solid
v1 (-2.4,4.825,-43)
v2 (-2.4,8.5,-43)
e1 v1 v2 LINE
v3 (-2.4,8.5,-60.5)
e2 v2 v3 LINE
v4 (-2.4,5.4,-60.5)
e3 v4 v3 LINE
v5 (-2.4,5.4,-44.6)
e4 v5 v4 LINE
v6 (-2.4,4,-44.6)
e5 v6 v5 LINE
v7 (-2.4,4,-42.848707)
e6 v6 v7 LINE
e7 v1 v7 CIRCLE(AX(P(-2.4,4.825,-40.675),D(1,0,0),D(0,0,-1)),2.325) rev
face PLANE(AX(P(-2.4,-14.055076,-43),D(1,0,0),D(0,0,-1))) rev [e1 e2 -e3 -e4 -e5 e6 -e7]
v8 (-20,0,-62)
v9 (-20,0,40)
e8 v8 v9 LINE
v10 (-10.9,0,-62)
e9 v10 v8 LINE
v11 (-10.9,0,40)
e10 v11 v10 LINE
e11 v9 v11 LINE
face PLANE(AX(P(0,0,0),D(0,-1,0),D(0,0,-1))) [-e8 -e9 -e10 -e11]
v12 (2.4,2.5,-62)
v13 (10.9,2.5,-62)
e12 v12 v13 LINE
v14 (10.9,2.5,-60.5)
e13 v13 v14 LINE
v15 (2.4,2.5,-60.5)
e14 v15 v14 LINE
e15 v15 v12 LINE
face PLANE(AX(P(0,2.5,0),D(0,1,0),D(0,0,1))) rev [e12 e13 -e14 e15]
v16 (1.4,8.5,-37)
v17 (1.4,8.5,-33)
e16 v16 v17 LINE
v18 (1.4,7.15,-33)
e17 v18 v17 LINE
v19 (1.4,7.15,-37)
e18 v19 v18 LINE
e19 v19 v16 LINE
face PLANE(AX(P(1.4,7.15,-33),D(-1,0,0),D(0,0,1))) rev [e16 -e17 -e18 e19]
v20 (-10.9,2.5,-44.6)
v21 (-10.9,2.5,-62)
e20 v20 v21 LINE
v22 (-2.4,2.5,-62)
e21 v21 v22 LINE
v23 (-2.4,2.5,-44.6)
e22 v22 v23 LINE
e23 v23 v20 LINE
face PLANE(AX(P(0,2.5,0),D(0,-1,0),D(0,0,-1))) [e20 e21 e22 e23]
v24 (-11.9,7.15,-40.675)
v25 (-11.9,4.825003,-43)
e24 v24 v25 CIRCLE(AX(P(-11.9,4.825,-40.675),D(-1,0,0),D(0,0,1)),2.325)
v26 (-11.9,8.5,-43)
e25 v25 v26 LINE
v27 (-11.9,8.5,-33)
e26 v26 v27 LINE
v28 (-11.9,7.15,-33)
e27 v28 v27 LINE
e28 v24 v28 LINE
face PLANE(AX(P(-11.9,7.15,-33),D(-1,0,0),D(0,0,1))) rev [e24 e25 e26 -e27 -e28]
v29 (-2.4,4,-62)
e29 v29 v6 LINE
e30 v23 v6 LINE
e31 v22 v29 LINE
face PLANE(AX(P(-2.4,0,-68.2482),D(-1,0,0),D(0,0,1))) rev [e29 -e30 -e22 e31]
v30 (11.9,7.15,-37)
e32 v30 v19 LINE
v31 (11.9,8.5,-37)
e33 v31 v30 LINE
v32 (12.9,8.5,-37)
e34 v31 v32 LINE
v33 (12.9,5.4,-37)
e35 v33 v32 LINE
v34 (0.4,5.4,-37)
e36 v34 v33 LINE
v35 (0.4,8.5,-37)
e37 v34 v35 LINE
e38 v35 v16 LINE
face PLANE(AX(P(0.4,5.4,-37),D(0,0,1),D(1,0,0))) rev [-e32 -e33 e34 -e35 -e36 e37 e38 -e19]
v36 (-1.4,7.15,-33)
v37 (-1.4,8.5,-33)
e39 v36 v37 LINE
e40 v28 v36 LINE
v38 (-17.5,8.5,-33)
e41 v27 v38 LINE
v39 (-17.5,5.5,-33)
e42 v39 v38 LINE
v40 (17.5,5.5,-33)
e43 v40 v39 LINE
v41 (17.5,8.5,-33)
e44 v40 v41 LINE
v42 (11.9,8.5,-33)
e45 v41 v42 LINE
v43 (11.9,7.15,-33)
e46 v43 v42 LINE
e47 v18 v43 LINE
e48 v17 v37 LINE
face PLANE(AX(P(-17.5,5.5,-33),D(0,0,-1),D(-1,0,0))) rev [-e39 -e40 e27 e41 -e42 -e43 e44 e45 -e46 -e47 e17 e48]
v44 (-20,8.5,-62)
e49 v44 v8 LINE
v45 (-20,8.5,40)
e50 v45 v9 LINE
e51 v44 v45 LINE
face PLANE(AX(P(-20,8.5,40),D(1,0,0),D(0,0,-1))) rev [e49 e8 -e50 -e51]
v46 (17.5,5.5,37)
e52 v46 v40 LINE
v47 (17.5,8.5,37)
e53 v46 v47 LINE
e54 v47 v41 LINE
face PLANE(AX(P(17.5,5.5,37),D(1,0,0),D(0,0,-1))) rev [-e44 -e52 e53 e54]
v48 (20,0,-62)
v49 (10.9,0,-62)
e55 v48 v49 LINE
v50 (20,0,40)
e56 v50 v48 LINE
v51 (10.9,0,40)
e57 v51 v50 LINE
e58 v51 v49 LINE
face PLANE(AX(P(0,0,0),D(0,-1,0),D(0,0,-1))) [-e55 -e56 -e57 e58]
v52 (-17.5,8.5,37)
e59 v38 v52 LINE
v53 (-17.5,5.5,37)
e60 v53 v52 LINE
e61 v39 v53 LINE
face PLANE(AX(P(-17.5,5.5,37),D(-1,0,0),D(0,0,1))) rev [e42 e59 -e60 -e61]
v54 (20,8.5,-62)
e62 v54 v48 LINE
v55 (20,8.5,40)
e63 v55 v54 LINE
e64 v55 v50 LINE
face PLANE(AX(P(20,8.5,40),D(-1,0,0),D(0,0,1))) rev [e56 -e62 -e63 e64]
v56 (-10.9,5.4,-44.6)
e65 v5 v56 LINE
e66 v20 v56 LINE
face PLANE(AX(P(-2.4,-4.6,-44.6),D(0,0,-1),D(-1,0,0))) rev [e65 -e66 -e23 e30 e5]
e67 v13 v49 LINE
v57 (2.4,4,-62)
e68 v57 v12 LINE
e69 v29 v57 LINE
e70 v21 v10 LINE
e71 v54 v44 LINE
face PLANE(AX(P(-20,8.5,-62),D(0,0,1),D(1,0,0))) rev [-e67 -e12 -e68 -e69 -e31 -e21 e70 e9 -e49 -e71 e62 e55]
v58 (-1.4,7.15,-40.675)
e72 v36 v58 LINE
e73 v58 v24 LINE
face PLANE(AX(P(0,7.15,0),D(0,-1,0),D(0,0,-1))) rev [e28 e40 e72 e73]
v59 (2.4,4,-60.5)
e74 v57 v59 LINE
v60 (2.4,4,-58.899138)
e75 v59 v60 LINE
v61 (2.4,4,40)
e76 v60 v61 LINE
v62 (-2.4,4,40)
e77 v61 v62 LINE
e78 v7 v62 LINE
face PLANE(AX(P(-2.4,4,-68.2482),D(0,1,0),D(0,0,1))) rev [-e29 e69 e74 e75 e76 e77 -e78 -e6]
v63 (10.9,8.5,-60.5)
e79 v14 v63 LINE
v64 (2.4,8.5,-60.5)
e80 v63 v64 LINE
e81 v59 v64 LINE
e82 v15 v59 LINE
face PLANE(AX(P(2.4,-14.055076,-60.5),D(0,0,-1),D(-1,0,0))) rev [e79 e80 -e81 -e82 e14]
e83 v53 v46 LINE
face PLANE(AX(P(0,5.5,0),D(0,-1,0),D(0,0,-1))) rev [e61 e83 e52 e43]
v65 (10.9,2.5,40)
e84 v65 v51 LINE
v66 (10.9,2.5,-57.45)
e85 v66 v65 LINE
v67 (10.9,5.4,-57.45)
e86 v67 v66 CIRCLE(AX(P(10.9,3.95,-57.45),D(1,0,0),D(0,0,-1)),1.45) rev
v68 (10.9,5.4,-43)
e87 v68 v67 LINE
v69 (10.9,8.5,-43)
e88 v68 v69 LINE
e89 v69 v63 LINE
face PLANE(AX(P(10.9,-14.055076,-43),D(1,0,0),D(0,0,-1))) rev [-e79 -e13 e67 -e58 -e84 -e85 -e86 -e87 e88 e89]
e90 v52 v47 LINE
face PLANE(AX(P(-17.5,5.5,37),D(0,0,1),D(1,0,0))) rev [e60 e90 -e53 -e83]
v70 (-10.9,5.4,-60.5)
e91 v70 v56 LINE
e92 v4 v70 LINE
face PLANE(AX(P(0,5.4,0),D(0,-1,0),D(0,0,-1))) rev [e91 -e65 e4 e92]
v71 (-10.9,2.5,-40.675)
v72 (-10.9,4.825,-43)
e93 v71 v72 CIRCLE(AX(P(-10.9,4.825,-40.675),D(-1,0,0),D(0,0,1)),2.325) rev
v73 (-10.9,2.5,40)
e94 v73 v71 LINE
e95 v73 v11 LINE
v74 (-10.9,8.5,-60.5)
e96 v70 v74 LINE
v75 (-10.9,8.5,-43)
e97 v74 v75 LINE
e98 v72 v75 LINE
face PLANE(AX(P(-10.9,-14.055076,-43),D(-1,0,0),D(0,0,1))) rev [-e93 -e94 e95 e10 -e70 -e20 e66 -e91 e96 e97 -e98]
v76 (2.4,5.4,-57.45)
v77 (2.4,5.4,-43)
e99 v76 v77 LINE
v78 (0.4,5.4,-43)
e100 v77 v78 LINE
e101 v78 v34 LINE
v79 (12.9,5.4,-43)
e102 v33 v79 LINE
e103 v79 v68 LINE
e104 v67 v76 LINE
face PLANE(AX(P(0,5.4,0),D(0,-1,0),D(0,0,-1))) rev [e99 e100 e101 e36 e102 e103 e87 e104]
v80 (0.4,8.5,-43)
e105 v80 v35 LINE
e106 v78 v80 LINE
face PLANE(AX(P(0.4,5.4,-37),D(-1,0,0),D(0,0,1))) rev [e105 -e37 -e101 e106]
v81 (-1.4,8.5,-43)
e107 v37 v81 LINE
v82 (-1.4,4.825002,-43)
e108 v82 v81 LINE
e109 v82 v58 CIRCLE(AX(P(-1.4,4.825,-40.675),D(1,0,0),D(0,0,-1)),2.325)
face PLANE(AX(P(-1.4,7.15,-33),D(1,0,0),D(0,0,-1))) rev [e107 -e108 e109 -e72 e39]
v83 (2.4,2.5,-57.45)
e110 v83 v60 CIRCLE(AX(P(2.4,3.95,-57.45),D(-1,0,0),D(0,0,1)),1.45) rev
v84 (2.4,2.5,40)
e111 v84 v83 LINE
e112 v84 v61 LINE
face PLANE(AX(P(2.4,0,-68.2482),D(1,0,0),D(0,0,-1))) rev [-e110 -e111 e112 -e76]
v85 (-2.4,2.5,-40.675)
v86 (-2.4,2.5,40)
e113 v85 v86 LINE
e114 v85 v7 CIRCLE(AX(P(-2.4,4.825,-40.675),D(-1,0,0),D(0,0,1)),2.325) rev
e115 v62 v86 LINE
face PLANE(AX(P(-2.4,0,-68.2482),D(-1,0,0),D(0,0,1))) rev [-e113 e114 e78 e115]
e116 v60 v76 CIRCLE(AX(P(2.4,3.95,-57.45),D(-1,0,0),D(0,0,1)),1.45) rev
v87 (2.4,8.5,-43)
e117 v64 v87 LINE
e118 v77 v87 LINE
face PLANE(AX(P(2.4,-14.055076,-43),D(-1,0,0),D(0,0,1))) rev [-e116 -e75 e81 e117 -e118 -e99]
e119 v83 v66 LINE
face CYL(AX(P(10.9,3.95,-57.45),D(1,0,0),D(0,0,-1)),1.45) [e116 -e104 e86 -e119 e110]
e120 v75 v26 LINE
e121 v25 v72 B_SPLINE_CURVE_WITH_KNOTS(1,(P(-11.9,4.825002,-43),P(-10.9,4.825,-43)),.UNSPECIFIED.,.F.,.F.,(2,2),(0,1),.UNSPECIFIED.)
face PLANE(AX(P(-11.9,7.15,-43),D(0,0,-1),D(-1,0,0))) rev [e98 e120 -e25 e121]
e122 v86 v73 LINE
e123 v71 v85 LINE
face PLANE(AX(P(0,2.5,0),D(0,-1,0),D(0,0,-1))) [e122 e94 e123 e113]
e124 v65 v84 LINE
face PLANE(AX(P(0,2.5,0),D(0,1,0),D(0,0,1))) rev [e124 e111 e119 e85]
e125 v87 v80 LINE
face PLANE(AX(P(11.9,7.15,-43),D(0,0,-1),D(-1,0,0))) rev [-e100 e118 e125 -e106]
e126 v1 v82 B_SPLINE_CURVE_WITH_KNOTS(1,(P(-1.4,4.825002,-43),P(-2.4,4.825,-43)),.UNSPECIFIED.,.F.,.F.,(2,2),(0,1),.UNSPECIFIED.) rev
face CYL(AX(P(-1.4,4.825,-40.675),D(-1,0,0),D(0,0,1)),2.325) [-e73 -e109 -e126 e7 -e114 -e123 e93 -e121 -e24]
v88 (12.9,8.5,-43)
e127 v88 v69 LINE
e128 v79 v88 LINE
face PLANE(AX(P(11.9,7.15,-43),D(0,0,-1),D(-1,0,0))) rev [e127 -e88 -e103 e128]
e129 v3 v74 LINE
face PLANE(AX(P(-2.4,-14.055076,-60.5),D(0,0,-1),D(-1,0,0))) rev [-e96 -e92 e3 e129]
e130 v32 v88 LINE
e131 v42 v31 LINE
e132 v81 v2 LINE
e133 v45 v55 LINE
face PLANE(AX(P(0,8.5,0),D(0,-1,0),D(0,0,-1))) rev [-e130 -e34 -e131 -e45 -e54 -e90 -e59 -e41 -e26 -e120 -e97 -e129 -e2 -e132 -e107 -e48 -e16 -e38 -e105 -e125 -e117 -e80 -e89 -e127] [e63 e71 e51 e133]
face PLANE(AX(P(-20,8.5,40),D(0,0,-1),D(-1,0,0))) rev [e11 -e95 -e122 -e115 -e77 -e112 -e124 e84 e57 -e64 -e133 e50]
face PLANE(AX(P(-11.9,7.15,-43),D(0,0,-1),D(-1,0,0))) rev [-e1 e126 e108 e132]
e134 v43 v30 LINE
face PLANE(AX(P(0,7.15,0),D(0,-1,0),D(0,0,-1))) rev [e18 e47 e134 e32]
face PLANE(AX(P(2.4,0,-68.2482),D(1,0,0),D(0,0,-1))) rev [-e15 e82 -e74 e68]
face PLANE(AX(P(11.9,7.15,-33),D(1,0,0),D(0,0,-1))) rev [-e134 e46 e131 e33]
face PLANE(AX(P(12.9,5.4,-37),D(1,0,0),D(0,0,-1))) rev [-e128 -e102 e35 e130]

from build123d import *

# Parameters (mm, degrees)
SKETCH1_W               = 40
SKETCH1_H               = 102
BOSS_EXTRUDE1_DEPTH     = 8.5
SKETCH2_W               = 35
SKETCH2_H               = 70
CUT_EXTRUDE1_DEPTH      = 3
SKETCH3_W               = 10.5
SKETCH3_H               = 10
CUT_EXTRUDE2_DEPTH      = 1.35
SKETCH4_W               = 12.5
SKETCH4_H               = 6
CUT_EXTRUDE3_DEPTH      = 3.1
SKETCH5_W               = 8.5
SKETCH5_H               = 17.5
PCB_PLACE_DEPTH         = 3.1
SKETCH6_W               = 8.5
SKETCH6_H               = 1.6
NICKEL_STRIP_HOLE_DEPTH = 66.369411807
CUT_EXTRUDE4_REACH      = 67.698
SKETCH7_W               = 8.5
SKETCH7_H               = 17.5
SKETCH8_W               = 8.5
SKETCH8_H               = 1.6
CUT_EXTRUDE5_DEPTH      = 10
SKETCH9_W               = 8.5
SKETCH9_H               = 102
NICKEL_STRIP_RAIL_DEPTH = 2.5
FILLET3_R               = 2.325
FILLET4_RADIUS          = 1.45
FILLET4_LENGTH          = 8.5
CUT_EXTRUDE6_REACH      = 106.289
SKETCH10_W              = 4.8
SKETCH10_H              = 4


with BuildPart() as part:
    # Sketch1 → Boss-Extrude1 (new body)
    with BuildSketch(Plane(origin=(0, 0, 0), x_dir=(1, 0, 0), z_dir=(0, 1, 0))):
        with Locations((0, 11)):
            Rectangle(SKETCH1_W, SKETCH1_H)
    extrude(amount=BOSS_EXTRUDE1_DEPTH)

    # Sketch2 → Cut-Extrude1 (cut)
    with BuildSketch(Plane(origin=(0, 8.5, 0), x_dir=(1, 0, 0), z_dir=(0, 1, 0))):
        with Locations((0, -2)):
            Rectangle(SKETCH2_W, SKETCH2_H)
    extrude(amount=-CUT_EXTRUDE1_DEPTH, mode=Mode.SUBTRACT)

    # Sketch3 → Cut-Extrude2 (cut)
    with BuildSketch(Plane(origin=(0, 8.5, 0), x_dir=(1, 0, 0), z_dir=(0, 1, 0))):
        with Locations((-6.65, 38)):
            Rectangle(SKETCH3_W, SKETCH3_H)
        with Locations((6.65, 38)):
            Rectangle(SKETCH3_W, SKETCH3_H)
    extrude(amount=-CUT_EXTRUDE2_DEPTH, mode=Mode.SUBTRACT)

    # Sketch4 → Cut-Extrude3 (cut)
    with BuildSketch(Plane(origin=(0, 8.5, 0), x_dir=(1, 0, 0), z_dir=(0, 1, 0))):
        with Locations((6.65, 40)):
            Rectangle(SKETCH4_W, SKETCH4_H)
    extrude(amount=-CUT_EXTRUDE3_DEPTH, mode=Mode.SUBTRACT)

    # Sketch5 → PCB place (cut)
    with BuildSketch(Plane(origin=(0, 8.5, 0), x_dir=(1, 0, 0), z_dir=(0, 1, 0))):
        with Locations((6.65, 51.75)):
            Rectangle(SKETCH5_W, SKETCH5_H)
    extrude(amount=-PCB_PLACE_DEPTH, mode=Mode.SUBTRACT)

    # Sketch6 → Nickel strip hole (cut, through all)
    with BuildSketch(Plane(origin=(0, 5.4, 0), x_dir=(1, 0, 0), z_dir=(0, 1, 0))):
        with Locations((6.65, 59.7)):
            Rectangle(SKETCH6_W, SKETCH6_H)
    extrude(amount=-NICKEL_STRIP_HOLE_DEPTH, mode=Mode.SUBTRACT)

    # Cut-Extrude4: up to this face of the body (flat: up to its plane)
    cut_extrude4_end = Plane(part.part.faces().sort_by_distance((6.65, 5.4, -47.042077088))[0])
    # Sketch7 → Cut-Extrude4 (cut, up to the picked face)
    with BuildSketch(Plane(origin=(0, 8.5, 0), x_dir=(1, 0, 0), z_dir=(0, 1, 0)), mode=Mode.PRIVATE) as cut_extrude4_sk1:
        with Locations((-6.65, 51.75)):
            Rectangle(SKETCH7_W, SKETCH7_H)
    cut_extrude4_tool1 = split(extrude(cut_extrude4_sk1.sketch, amount=-CUT_EXTRUDE4_REACH, mode=Mode.PRIVATE), bisect_by=cut_extrude4_end, keep=Keep.BOTH, mode=Mode.PRIVATE)
    add(cut_extrude4_tool1.solids().sort_by(Axis((-6.65, 8.5, -51.75), (0, -1, 0)))[0], mode=Mode.SUBTRACT)

    # Sketch8 → Cut-Extrude5 (cut)
    with BuildSketch(Plane(origin=(0, 5.4, 0), x_dir=(1, 0, 0), z_dir=(0, 1, 0))):
        with Locations((-6.65, 43.8)):
            Rectangle(SKETCH8_W, SKETCH8_H)
    extrude(amount=-CUT_EXTRUDE5_DEPTH, mode=Mode.SUBTRACT)

    # Sketch9 → Nickel strip rail (cut)
    with BuildSketch(Plane.XZ):
        with Locations((-6.65, -11)):
            Rectangle(SKETCH9_W, SKETCH9_H)
        with Locations((6.65, -11)):
            Rectangle(SKETCH9_W, SKETCH9_H)
    extrude(amount=-NICKEL_STRIP_RAIL_DEPTH, mode=Mode.SUBTRACT)

    # Fillet3
    # the kernel refuses this fillet: 2.325 mm, written as the material it takes off along each edge
    with BuildSketch(Plane(origin=(3.4125, 7.15, -43), x_dir=(0, 0, 1), z_dir=(-1, 0, 0))) as fillet3_piece_1_section:
        with BuildLine():
            CenterArc((FILLET3_R, -FILLET3_R), FILLET3_R, 90, 90)
            Line((0, -FILLET3_R), (0, 0))
            Line((0, 0), (FILLET3_R, 0))
        make_face()
    fillet3_piece_1 = extrude(amount=20.125, mode=Mode.PRIVATE)
    fillet3_piece_1 = split(fillet3_piece_1, bisect_by=Plane(origin=(-11.9, 7.15, -43), z_dir=(1, 0, 0)), keep=Keep.TOP, mode=Mode.PRIVATE)
    fillet3_piece_1 = split(fillet3_piece_1, bisect_by=Plane(origin=(-1.4, 7.15, -43), z_dir=(-1, 0, 0)), keep=Keep.TOP, mode=Mode.PRIVATE)
    add(fillet3_piece_1, mode=Mode.SUBTRACT)
    with BuildSketch(Plane(origin=(-10.9, 2.5, -43), x_dir=(0, 1, 0), z_dir=(1, 0, 0))) as fillet3_piece_2:
        with BuildLine():
            CenterArc((FILLET3_R, FILLET3_R), FILLET3_R, 180, 90)
            Line((0, FILLET3_R), (0, 0))
            Line((0, 0), (FILLET3_R, 0))
        make_face()
    extrude(amount=8.5, mode=Mode.SUBTRACT)

    # Fillet4: full round fillet: the end face becomes a half cylinder, R = half its width
    fillet4_face = Plane((6.65, 3.95, -58.9), x_dir=(-1, 0, 0), z_dir=(0, 0, -1))  # on the end face: x along it, z out of the body
    fillet4_slab = fillet4_face.offset(-FILLET4_RADIUS / 2) * Box(FILLET4_LENGTH, 2 * FILLET4_RADIUS, FILLET4_RADIUS, mode=Mode.PRIVATE)  # the body's end, R deep
    fillet4_round = Plane((6.65, 3.95, -57.45), x_dir=(0, 0, -1), z_dir=(-1, 0, 0)) * Cylinder(FILLET4_RADIUS, FILLET4_LENGTH, mode=Mode.PRIVATE)  # its axis R under the face
    add(fillet4_slab - fillet4_round, mode=Mode.SUBTRACT)

    # Cut-Extrude6: up to this face of the body (flat: up to its plane)
    cut_extrude6_end = Plane(part.part.faces().sort_by_distance((0, 4.678571429, -62))[0])
    # Sketch10 → Cut-Extrude6 (cut, up to the picked face)
    with BuildSketch(Plane.XY.offset(40), mode=Mode.PRIVATE) as cut_extrude6_sk1:
        with Locations((0, 2)):
            Rectangle(SKETCH10_W, SKETCH10_H)
    cut_extrude6_tool1 = split(extrude(cut_extrude6_sk1.sketch, amount=-CUT_EXTRUDE6_REACH, mode=Mode.PRIVATE), bisect_by=cut_extrude6_end, keep=Keep.BOTH, mode=Mode.PRIVATE)
    add(cut_extrude6_tool1.solids().sort_by(Axis((0, 2, 40), (0, 0, -1)))[0], mode=Mode.SUBTRACT)


solid = part.part
